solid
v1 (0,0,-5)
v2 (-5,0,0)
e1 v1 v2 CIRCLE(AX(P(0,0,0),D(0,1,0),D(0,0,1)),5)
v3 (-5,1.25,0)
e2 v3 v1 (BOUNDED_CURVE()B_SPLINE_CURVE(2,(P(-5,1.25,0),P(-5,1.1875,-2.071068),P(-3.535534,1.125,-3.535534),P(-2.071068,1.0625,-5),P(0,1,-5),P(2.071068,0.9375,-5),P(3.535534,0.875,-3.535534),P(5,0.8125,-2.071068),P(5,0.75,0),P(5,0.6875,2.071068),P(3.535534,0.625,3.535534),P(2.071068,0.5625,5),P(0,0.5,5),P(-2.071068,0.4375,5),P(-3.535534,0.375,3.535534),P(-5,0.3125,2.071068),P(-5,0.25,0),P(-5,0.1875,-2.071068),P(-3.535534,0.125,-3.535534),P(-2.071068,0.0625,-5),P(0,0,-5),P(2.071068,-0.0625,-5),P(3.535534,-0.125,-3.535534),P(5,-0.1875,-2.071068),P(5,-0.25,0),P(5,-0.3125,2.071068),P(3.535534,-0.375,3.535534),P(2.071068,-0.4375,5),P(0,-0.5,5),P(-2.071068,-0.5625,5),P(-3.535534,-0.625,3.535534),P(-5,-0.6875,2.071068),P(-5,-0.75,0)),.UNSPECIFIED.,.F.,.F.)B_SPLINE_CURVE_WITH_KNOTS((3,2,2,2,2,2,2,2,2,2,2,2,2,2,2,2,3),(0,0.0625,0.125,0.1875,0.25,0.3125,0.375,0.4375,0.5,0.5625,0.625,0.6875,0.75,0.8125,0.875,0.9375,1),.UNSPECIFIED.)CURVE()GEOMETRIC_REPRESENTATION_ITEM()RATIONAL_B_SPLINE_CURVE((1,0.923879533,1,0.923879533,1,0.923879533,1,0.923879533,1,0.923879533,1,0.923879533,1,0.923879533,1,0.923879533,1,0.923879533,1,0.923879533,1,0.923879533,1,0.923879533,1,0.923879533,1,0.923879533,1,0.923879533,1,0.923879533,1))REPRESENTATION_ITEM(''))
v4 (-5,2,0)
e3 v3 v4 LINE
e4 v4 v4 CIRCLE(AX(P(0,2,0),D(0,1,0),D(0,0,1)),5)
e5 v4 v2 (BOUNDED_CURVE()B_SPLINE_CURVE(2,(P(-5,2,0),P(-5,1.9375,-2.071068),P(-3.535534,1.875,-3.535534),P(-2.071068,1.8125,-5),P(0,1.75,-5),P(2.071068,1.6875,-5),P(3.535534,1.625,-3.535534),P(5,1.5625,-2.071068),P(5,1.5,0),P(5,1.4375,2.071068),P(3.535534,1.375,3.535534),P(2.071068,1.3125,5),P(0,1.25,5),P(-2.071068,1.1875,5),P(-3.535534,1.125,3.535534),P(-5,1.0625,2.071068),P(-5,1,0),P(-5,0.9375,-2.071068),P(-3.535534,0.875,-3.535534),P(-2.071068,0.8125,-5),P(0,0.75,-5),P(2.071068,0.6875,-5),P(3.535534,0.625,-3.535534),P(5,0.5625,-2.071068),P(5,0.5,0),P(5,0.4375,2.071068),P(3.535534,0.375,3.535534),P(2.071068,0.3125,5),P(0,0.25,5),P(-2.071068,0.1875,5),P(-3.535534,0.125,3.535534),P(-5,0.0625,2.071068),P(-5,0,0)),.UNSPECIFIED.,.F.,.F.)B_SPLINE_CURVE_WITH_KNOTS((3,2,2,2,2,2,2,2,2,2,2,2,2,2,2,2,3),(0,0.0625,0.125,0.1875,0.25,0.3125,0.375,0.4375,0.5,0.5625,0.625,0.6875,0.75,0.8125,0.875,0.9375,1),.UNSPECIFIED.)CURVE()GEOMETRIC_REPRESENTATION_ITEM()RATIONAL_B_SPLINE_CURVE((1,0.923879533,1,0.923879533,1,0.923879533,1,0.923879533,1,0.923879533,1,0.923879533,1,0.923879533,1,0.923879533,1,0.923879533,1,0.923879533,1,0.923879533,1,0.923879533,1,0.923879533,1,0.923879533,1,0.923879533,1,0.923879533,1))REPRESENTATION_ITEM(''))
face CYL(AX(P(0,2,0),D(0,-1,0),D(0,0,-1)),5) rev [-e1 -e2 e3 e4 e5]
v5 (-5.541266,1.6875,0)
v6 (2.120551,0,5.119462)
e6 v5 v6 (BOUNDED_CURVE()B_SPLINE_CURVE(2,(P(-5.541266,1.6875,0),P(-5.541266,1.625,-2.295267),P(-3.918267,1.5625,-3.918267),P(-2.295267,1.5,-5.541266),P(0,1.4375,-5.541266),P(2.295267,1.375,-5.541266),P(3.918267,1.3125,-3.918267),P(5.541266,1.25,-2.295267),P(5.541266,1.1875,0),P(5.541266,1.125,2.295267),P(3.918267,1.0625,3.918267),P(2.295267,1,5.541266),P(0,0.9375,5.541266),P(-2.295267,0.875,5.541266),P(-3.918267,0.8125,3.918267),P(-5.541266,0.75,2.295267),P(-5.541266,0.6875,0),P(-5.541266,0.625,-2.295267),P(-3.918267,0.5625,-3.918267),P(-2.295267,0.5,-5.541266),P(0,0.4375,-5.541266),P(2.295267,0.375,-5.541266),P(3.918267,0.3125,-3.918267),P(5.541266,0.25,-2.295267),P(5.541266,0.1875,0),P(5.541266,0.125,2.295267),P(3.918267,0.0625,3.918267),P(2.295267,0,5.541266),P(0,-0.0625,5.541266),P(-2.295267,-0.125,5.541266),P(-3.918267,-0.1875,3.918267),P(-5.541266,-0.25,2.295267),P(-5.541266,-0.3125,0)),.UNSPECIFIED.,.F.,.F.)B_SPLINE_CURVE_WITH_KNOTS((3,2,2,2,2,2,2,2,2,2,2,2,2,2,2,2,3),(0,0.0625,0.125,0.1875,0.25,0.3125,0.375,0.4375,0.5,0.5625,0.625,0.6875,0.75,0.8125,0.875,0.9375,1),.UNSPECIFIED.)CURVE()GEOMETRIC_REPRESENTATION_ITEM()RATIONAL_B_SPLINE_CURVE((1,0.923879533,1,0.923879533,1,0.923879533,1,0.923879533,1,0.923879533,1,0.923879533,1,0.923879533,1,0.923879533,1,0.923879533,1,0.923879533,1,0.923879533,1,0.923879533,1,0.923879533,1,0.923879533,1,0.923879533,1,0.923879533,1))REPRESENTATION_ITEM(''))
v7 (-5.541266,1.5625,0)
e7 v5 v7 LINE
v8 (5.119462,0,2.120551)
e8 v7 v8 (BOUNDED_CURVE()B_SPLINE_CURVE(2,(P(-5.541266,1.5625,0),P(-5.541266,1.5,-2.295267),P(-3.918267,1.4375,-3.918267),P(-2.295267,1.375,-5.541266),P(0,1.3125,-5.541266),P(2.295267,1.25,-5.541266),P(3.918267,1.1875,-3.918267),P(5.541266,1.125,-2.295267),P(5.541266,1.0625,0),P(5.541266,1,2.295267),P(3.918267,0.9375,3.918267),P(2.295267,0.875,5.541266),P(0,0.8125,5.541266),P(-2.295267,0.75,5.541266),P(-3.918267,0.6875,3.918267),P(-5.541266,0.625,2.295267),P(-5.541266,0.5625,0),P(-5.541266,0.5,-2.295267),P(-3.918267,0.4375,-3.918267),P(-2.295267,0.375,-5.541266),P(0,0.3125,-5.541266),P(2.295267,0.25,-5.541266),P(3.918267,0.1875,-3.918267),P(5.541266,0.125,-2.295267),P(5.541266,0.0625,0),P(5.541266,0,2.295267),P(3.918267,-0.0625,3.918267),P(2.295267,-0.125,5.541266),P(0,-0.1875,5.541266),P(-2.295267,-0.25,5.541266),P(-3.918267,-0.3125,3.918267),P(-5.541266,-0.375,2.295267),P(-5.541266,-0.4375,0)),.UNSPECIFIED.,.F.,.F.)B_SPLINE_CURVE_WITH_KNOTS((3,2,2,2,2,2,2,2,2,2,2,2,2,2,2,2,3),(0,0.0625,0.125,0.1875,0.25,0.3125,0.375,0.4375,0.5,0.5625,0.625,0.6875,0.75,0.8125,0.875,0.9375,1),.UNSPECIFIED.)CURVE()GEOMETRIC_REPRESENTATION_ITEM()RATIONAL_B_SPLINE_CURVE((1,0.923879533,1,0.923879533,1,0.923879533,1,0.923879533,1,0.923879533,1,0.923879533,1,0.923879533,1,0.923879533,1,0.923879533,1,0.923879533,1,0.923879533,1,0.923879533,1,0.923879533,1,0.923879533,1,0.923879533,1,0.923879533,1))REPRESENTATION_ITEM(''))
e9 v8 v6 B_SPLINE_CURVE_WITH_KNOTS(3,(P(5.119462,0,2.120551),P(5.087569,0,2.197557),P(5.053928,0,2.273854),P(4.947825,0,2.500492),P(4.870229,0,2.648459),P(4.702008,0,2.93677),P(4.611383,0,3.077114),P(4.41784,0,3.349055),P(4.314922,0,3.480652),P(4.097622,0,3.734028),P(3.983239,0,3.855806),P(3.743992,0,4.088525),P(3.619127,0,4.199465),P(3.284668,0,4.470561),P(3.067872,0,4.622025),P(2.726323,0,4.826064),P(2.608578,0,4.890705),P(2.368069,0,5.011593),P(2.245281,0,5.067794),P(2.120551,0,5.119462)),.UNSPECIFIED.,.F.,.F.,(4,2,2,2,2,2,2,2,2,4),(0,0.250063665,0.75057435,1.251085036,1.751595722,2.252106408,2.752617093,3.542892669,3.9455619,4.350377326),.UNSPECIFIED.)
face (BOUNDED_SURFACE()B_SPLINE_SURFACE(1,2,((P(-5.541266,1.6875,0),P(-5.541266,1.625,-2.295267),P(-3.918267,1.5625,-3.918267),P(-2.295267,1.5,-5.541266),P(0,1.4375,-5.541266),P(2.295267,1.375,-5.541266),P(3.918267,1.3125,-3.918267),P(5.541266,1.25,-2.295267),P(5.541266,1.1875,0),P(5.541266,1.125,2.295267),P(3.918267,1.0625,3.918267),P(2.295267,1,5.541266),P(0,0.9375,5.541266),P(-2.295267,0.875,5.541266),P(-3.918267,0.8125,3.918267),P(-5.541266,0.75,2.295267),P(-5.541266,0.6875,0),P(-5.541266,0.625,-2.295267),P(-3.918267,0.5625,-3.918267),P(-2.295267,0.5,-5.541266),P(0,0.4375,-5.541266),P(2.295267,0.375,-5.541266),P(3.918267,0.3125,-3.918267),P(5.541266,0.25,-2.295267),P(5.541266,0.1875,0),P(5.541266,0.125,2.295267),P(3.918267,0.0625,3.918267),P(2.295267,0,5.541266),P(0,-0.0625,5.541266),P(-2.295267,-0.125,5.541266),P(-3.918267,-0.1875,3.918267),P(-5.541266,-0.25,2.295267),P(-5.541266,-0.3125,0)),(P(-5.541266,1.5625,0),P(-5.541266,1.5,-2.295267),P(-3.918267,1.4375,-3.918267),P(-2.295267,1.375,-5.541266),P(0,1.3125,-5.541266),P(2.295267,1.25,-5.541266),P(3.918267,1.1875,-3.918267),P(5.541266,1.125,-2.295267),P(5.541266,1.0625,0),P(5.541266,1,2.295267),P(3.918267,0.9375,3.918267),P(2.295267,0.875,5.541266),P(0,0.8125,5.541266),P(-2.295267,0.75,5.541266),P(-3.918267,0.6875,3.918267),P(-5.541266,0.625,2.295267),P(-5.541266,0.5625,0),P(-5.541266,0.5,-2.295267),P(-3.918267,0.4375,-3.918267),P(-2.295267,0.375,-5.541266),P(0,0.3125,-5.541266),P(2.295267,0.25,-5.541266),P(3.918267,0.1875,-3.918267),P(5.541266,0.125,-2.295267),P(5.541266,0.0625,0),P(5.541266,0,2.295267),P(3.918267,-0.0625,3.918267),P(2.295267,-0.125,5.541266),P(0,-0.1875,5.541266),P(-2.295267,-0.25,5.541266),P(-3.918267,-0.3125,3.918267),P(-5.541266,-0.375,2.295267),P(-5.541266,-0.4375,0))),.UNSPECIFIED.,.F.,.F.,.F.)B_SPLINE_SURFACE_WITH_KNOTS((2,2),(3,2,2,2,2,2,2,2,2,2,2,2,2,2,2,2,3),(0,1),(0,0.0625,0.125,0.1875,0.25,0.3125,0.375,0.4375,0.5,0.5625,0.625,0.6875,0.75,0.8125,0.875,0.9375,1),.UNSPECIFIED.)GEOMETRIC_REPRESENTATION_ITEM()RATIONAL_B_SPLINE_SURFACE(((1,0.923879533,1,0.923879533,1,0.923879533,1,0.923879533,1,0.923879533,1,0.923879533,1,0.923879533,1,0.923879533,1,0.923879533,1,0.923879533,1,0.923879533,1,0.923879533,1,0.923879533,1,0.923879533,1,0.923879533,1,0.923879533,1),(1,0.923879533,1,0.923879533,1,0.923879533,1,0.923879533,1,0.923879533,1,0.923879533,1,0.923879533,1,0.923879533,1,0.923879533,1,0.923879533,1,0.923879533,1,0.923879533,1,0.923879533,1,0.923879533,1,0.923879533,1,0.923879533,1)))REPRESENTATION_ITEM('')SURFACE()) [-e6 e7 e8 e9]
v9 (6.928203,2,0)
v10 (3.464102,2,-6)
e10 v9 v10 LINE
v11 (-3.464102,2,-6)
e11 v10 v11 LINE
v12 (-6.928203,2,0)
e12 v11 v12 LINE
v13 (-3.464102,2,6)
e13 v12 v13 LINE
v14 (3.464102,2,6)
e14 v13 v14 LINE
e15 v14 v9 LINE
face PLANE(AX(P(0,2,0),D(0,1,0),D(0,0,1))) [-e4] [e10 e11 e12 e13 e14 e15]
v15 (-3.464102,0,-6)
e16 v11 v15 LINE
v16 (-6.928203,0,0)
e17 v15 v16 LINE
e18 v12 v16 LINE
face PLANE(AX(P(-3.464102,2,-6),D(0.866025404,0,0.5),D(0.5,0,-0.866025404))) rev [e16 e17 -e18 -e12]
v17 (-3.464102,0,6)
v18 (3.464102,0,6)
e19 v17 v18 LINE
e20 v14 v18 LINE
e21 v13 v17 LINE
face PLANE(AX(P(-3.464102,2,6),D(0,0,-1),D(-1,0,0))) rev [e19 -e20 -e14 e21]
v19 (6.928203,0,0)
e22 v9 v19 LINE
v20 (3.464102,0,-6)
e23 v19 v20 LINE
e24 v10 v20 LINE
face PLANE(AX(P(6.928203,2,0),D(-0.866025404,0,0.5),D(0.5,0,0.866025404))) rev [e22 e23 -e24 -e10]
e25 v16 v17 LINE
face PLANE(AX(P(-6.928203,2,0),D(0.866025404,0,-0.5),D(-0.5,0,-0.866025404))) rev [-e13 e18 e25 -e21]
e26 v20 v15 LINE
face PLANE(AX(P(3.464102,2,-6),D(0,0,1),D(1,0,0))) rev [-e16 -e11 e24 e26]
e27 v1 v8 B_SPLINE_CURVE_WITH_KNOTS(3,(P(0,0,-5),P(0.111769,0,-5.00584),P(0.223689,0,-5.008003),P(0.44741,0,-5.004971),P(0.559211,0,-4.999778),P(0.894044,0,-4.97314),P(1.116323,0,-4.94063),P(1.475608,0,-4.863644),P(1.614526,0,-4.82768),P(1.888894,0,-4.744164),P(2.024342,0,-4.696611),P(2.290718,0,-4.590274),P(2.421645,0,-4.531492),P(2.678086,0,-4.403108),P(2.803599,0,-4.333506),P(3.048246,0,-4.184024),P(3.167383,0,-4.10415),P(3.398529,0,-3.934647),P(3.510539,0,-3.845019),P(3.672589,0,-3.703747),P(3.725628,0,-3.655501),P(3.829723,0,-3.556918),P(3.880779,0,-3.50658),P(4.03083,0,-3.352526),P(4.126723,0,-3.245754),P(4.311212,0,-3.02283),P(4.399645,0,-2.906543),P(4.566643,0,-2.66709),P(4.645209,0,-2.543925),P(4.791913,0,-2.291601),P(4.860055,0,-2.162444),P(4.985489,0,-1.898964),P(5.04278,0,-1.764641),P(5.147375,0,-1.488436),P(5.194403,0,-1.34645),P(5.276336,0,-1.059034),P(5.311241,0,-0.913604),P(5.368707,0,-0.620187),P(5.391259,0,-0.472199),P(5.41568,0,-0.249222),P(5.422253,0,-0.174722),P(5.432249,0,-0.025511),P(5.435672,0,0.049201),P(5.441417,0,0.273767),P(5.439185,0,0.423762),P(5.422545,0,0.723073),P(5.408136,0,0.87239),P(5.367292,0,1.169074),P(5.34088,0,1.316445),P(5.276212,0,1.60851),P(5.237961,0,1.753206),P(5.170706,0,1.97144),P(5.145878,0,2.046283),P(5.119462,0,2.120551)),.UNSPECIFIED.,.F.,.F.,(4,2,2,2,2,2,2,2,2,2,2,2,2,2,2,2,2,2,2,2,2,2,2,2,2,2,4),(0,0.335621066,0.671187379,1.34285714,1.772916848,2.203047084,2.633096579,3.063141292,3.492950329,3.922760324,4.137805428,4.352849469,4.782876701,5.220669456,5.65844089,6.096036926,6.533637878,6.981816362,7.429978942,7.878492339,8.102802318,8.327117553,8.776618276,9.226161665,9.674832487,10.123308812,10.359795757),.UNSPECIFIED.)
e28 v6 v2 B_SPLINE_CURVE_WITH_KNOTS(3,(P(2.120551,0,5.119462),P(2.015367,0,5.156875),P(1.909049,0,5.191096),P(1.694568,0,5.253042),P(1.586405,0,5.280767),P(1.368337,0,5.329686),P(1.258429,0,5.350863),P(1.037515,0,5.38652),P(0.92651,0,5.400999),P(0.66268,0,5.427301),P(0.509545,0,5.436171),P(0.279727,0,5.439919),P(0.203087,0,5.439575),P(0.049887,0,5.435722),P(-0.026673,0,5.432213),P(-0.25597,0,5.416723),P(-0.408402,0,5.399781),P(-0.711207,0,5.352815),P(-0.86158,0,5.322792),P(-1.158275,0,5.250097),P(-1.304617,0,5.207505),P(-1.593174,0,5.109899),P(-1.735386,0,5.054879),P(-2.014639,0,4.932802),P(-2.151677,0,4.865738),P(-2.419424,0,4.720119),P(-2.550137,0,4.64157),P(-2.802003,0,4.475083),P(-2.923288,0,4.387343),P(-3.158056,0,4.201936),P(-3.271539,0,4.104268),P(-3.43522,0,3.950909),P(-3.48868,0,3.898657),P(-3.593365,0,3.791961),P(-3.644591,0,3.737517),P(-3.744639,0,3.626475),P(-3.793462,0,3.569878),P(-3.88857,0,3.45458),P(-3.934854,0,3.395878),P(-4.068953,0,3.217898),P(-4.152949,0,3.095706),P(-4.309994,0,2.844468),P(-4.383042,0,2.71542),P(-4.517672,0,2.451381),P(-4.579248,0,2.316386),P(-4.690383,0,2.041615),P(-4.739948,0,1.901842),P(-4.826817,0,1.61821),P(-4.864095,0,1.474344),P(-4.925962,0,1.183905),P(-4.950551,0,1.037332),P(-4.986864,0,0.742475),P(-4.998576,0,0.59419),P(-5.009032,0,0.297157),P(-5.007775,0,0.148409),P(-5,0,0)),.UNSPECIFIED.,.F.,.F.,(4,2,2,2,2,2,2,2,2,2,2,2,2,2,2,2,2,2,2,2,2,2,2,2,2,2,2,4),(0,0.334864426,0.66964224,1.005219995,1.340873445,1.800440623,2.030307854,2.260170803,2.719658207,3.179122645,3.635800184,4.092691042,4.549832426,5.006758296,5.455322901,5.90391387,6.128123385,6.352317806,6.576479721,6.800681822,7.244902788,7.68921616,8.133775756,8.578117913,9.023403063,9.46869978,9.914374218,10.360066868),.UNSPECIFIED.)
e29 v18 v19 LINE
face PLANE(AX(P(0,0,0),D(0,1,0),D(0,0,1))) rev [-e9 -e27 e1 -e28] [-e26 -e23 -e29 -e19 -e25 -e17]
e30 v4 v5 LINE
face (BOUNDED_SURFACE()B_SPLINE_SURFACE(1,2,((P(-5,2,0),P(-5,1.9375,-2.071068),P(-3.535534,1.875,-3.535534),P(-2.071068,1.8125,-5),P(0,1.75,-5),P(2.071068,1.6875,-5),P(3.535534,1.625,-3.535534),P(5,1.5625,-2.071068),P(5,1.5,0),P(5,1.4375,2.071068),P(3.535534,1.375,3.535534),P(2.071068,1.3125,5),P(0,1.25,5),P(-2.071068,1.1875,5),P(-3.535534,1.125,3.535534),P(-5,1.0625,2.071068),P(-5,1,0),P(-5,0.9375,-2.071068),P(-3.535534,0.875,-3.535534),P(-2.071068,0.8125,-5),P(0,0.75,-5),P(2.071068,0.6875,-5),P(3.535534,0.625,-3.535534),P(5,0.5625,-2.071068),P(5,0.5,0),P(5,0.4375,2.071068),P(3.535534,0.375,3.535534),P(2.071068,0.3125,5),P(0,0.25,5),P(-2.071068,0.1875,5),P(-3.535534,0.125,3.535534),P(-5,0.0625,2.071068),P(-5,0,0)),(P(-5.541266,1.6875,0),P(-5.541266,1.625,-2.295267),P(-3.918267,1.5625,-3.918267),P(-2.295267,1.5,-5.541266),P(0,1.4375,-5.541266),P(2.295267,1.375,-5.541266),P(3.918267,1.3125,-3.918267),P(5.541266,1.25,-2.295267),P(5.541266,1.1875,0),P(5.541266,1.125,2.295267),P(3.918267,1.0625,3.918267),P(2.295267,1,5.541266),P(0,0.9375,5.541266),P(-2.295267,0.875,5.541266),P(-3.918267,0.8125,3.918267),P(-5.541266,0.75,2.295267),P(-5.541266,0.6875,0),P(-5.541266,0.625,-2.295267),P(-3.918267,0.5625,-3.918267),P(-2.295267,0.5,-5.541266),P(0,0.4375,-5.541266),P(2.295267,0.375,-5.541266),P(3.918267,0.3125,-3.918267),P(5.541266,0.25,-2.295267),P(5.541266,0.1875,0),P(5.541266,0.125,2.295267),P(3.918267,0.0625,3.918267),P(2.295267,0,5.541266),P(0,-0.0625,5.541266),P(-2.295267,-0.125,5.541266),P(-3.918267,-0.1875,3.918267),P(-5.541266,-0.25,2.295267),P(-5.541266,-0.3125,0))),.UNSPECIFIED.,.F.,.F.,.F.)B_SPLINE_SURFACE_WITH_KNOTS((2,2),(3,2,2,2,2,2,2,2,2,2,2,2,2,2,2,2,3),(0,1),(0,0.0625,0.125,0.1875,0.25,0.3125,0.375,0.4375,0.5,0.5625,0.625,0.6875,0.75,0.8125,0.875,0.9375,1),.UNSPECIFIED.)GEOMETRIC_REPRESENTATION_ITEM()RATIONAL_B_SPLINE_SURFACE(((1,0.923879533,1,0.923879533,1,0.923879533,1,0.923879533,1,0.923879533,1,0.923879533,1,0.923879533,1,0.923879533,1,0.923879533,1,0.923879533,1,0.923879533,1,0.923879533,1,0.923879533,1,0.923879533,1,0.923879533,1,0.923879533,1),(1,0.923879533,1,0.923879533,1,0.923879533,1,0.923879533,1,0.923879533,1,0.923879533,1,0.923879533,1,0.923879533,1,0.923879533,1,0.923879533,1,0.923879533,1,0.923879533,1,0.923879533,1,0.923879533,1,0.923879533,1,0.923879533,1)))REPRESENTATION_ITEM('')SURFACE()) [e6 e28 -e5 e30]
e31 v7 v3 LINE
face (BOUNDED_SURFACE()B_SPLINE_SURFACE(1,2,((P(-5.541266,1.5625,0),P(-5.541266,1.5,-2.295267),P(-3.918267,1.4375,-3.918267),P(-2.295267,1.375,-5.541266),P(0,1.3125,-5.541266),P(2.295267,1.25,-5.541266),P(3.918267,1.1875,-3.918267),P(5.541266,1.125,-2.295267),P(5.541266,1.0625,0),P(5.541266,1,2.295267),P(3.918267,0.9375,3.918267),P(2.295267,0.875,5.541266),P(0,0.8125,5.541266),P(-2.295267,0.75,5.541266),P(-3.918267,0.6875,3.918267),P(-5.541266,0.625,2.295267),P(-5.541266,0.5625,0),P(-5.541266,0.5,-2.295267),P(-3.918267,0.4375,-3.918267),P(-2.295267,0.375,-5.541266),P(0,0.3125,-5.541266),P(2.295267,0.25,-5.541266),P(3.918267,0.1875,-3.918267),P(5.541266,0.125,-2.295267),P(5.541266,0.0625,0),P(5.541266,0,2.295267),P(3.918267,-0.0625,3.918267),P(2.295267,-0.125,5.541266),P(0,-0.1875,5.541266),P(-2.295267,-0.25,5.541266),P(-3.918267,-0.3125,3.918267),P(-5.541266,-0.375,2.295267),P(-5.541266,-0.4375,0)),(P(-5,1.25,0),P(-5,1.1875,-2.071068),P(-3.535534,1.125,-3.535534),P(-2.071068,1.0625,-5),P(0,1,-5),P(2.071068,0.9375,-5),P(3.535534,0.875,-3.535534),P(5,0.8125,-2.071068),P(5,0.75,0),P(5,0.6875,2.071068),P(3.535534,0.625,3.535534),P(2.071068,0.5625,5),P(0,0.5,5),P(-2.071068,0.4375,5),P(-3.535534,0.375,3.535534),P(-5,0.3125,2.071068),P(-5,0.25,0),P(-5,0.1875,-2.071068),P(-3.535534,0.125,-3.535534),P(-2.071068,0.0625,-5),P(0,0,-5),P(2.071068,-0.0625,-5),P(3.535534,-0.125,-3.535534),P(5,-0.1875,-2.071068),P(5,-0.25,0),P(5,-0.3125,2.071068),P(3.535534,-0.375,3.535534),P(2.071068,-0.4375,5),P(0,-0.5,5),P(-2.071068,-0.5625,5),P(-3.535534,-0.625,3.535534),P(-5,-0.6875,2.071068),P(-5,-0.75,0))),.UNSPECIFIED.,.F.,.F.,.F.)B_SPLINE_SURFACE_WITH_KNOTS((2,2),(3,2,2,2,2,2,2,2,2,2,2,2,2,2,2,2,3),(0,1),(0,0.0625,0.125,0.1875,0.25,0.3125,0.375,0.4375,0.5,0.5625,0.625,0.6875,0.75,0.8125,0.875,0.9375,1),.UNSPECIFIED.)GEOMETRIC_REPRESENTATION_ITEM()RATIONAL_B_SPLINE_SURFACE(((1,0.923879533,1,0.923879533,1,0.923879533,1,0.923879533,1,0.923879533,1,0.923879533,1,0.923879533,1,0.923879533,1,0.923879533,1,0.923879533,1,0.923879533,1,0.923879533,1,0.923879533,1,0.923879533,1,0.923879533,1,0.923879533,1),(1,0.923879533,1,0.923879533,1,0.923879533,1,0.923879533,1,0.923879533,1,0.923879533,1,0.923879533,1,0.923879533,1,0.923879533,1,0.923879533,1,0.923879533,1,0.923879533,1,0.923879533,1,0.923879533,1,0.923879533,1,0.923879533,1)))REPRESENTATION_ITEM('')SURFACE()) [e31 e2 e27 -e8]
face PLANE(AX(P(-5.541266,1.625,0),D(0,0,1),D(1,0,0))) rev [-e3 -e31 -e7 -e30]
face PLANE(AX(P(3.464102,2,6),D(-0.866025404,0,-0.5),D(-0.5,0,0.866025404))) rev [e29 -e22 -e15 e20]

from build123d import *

# Parameters (mm, degrees)
SKETCH1_R           = 5
BOSS_EXTRUDE1_DEPTH = 2
THREAD1_PITCH       = 1


with BuildPart() as part:
    # Sketch1 → Boss-Extrude1 (new body)
    with BuildSketch(Plane(origin=(0, 0, 0), x_dir=(1, 0, 0), z_dir=(0, 1, 0))):
        Polygon((6.92820323, 0), (3.464101615, 6), (-3.464101615, 6), (-6.92820323, 0), (-3.464101615, -6), (3.464101615, -6), align=None)
        with Locations(Location((0, 0, 0), (0, 0, 270))):
            Circle(SKETCH1_R, mode=Mode.SUBTRACT)
    extrude(amount=BOSS_EXTRUDE1_DEPTH)

    # Thread1: the profile of Thread Profile1 profile screwed along a right-hand helix of 2 turns, 8 arcs to a turn; built about Z, then put on its axis
    thread1_z = Axis((0, 0, 0), (0, 0, 1))
    thread1_corners = [(4.9997, 0, -0.000173205), (5.541265875, 0, 0.312499999), (5.541265875, 0, 0.437499999), (4.9997, 0, 0.750173202)]
    with BuildLine(mode=Mode.PRIVATE) as thread1_profile:
        Line(thread1_corners[0], thread1_corners[1])
        Line(thread1_corners[1], thread1_corners[2])
        Line(thread1_corners[2], thread1_corners[3])
        Line(thread1_corners[3], thread1_corners[0])
    thread1_cap = Face(thread1_profile.wire())
    thread1_turn_angles = [0, 22.5, 45, 67.5, 90, 112.5, 135, 157.5, 180, 202.5, 225, 247.5, 270, 292.5, 315, 337.5, 360]
    thread1_turn_weights = [1, 0.9238795325112867, 1, 0.9238795325112867, 1, 0.9238795325112867, 1, 0.9238795325112867, 1, 0.9238795325112867, 1, 0.9238795325112867, 1, 0.9238795325112867, 1, 0.9238795325112867, 1]
    thread1_turn_rails = [Edge.make_bspline([Vector(p[0], p[1], 0).rotate(thread1_z, thread1_turn_angles[k]) / thread1_turn_weights[k] + Vector(0, 0, p[2] + THREAD1_PITCH * thread1_turn_angles[k] / 360) for k in range(17)], [0, 0, 0, 1, 1, 2, 2, 3, 3, 4, 4, 5, 5, 6, 6, 7, 7, 8, 8, 8], 2, thread1_turn_weights) for p in thread1_corners]
    thread1_turn_sides = [Face.make_surface_from_curves(thread1_turn_rails[p[0]], thread1_turn_rails[p[1]]) for p in [(0, 1), (1, 2), (2, 3), (3, 0)]]
    thread1 = Plane(origin=(0, 2, 0), x_dir=(-1, 0, 0), z_dir=(0, -1, 0)) * Solid(Shell([*[p.moved(Location((0, 0, THREAD1_PITCH * i))) for i in range(2) for p in thread1_turn_sides], thread1_cap, thread1_cap.rotate(thread1_z, 720).moved(Location((0, 0, THREAD1_PITCH * 720 / 360)))]))
    add(thread1, mode=Mode.SUBTRACT)


solid = part.part
